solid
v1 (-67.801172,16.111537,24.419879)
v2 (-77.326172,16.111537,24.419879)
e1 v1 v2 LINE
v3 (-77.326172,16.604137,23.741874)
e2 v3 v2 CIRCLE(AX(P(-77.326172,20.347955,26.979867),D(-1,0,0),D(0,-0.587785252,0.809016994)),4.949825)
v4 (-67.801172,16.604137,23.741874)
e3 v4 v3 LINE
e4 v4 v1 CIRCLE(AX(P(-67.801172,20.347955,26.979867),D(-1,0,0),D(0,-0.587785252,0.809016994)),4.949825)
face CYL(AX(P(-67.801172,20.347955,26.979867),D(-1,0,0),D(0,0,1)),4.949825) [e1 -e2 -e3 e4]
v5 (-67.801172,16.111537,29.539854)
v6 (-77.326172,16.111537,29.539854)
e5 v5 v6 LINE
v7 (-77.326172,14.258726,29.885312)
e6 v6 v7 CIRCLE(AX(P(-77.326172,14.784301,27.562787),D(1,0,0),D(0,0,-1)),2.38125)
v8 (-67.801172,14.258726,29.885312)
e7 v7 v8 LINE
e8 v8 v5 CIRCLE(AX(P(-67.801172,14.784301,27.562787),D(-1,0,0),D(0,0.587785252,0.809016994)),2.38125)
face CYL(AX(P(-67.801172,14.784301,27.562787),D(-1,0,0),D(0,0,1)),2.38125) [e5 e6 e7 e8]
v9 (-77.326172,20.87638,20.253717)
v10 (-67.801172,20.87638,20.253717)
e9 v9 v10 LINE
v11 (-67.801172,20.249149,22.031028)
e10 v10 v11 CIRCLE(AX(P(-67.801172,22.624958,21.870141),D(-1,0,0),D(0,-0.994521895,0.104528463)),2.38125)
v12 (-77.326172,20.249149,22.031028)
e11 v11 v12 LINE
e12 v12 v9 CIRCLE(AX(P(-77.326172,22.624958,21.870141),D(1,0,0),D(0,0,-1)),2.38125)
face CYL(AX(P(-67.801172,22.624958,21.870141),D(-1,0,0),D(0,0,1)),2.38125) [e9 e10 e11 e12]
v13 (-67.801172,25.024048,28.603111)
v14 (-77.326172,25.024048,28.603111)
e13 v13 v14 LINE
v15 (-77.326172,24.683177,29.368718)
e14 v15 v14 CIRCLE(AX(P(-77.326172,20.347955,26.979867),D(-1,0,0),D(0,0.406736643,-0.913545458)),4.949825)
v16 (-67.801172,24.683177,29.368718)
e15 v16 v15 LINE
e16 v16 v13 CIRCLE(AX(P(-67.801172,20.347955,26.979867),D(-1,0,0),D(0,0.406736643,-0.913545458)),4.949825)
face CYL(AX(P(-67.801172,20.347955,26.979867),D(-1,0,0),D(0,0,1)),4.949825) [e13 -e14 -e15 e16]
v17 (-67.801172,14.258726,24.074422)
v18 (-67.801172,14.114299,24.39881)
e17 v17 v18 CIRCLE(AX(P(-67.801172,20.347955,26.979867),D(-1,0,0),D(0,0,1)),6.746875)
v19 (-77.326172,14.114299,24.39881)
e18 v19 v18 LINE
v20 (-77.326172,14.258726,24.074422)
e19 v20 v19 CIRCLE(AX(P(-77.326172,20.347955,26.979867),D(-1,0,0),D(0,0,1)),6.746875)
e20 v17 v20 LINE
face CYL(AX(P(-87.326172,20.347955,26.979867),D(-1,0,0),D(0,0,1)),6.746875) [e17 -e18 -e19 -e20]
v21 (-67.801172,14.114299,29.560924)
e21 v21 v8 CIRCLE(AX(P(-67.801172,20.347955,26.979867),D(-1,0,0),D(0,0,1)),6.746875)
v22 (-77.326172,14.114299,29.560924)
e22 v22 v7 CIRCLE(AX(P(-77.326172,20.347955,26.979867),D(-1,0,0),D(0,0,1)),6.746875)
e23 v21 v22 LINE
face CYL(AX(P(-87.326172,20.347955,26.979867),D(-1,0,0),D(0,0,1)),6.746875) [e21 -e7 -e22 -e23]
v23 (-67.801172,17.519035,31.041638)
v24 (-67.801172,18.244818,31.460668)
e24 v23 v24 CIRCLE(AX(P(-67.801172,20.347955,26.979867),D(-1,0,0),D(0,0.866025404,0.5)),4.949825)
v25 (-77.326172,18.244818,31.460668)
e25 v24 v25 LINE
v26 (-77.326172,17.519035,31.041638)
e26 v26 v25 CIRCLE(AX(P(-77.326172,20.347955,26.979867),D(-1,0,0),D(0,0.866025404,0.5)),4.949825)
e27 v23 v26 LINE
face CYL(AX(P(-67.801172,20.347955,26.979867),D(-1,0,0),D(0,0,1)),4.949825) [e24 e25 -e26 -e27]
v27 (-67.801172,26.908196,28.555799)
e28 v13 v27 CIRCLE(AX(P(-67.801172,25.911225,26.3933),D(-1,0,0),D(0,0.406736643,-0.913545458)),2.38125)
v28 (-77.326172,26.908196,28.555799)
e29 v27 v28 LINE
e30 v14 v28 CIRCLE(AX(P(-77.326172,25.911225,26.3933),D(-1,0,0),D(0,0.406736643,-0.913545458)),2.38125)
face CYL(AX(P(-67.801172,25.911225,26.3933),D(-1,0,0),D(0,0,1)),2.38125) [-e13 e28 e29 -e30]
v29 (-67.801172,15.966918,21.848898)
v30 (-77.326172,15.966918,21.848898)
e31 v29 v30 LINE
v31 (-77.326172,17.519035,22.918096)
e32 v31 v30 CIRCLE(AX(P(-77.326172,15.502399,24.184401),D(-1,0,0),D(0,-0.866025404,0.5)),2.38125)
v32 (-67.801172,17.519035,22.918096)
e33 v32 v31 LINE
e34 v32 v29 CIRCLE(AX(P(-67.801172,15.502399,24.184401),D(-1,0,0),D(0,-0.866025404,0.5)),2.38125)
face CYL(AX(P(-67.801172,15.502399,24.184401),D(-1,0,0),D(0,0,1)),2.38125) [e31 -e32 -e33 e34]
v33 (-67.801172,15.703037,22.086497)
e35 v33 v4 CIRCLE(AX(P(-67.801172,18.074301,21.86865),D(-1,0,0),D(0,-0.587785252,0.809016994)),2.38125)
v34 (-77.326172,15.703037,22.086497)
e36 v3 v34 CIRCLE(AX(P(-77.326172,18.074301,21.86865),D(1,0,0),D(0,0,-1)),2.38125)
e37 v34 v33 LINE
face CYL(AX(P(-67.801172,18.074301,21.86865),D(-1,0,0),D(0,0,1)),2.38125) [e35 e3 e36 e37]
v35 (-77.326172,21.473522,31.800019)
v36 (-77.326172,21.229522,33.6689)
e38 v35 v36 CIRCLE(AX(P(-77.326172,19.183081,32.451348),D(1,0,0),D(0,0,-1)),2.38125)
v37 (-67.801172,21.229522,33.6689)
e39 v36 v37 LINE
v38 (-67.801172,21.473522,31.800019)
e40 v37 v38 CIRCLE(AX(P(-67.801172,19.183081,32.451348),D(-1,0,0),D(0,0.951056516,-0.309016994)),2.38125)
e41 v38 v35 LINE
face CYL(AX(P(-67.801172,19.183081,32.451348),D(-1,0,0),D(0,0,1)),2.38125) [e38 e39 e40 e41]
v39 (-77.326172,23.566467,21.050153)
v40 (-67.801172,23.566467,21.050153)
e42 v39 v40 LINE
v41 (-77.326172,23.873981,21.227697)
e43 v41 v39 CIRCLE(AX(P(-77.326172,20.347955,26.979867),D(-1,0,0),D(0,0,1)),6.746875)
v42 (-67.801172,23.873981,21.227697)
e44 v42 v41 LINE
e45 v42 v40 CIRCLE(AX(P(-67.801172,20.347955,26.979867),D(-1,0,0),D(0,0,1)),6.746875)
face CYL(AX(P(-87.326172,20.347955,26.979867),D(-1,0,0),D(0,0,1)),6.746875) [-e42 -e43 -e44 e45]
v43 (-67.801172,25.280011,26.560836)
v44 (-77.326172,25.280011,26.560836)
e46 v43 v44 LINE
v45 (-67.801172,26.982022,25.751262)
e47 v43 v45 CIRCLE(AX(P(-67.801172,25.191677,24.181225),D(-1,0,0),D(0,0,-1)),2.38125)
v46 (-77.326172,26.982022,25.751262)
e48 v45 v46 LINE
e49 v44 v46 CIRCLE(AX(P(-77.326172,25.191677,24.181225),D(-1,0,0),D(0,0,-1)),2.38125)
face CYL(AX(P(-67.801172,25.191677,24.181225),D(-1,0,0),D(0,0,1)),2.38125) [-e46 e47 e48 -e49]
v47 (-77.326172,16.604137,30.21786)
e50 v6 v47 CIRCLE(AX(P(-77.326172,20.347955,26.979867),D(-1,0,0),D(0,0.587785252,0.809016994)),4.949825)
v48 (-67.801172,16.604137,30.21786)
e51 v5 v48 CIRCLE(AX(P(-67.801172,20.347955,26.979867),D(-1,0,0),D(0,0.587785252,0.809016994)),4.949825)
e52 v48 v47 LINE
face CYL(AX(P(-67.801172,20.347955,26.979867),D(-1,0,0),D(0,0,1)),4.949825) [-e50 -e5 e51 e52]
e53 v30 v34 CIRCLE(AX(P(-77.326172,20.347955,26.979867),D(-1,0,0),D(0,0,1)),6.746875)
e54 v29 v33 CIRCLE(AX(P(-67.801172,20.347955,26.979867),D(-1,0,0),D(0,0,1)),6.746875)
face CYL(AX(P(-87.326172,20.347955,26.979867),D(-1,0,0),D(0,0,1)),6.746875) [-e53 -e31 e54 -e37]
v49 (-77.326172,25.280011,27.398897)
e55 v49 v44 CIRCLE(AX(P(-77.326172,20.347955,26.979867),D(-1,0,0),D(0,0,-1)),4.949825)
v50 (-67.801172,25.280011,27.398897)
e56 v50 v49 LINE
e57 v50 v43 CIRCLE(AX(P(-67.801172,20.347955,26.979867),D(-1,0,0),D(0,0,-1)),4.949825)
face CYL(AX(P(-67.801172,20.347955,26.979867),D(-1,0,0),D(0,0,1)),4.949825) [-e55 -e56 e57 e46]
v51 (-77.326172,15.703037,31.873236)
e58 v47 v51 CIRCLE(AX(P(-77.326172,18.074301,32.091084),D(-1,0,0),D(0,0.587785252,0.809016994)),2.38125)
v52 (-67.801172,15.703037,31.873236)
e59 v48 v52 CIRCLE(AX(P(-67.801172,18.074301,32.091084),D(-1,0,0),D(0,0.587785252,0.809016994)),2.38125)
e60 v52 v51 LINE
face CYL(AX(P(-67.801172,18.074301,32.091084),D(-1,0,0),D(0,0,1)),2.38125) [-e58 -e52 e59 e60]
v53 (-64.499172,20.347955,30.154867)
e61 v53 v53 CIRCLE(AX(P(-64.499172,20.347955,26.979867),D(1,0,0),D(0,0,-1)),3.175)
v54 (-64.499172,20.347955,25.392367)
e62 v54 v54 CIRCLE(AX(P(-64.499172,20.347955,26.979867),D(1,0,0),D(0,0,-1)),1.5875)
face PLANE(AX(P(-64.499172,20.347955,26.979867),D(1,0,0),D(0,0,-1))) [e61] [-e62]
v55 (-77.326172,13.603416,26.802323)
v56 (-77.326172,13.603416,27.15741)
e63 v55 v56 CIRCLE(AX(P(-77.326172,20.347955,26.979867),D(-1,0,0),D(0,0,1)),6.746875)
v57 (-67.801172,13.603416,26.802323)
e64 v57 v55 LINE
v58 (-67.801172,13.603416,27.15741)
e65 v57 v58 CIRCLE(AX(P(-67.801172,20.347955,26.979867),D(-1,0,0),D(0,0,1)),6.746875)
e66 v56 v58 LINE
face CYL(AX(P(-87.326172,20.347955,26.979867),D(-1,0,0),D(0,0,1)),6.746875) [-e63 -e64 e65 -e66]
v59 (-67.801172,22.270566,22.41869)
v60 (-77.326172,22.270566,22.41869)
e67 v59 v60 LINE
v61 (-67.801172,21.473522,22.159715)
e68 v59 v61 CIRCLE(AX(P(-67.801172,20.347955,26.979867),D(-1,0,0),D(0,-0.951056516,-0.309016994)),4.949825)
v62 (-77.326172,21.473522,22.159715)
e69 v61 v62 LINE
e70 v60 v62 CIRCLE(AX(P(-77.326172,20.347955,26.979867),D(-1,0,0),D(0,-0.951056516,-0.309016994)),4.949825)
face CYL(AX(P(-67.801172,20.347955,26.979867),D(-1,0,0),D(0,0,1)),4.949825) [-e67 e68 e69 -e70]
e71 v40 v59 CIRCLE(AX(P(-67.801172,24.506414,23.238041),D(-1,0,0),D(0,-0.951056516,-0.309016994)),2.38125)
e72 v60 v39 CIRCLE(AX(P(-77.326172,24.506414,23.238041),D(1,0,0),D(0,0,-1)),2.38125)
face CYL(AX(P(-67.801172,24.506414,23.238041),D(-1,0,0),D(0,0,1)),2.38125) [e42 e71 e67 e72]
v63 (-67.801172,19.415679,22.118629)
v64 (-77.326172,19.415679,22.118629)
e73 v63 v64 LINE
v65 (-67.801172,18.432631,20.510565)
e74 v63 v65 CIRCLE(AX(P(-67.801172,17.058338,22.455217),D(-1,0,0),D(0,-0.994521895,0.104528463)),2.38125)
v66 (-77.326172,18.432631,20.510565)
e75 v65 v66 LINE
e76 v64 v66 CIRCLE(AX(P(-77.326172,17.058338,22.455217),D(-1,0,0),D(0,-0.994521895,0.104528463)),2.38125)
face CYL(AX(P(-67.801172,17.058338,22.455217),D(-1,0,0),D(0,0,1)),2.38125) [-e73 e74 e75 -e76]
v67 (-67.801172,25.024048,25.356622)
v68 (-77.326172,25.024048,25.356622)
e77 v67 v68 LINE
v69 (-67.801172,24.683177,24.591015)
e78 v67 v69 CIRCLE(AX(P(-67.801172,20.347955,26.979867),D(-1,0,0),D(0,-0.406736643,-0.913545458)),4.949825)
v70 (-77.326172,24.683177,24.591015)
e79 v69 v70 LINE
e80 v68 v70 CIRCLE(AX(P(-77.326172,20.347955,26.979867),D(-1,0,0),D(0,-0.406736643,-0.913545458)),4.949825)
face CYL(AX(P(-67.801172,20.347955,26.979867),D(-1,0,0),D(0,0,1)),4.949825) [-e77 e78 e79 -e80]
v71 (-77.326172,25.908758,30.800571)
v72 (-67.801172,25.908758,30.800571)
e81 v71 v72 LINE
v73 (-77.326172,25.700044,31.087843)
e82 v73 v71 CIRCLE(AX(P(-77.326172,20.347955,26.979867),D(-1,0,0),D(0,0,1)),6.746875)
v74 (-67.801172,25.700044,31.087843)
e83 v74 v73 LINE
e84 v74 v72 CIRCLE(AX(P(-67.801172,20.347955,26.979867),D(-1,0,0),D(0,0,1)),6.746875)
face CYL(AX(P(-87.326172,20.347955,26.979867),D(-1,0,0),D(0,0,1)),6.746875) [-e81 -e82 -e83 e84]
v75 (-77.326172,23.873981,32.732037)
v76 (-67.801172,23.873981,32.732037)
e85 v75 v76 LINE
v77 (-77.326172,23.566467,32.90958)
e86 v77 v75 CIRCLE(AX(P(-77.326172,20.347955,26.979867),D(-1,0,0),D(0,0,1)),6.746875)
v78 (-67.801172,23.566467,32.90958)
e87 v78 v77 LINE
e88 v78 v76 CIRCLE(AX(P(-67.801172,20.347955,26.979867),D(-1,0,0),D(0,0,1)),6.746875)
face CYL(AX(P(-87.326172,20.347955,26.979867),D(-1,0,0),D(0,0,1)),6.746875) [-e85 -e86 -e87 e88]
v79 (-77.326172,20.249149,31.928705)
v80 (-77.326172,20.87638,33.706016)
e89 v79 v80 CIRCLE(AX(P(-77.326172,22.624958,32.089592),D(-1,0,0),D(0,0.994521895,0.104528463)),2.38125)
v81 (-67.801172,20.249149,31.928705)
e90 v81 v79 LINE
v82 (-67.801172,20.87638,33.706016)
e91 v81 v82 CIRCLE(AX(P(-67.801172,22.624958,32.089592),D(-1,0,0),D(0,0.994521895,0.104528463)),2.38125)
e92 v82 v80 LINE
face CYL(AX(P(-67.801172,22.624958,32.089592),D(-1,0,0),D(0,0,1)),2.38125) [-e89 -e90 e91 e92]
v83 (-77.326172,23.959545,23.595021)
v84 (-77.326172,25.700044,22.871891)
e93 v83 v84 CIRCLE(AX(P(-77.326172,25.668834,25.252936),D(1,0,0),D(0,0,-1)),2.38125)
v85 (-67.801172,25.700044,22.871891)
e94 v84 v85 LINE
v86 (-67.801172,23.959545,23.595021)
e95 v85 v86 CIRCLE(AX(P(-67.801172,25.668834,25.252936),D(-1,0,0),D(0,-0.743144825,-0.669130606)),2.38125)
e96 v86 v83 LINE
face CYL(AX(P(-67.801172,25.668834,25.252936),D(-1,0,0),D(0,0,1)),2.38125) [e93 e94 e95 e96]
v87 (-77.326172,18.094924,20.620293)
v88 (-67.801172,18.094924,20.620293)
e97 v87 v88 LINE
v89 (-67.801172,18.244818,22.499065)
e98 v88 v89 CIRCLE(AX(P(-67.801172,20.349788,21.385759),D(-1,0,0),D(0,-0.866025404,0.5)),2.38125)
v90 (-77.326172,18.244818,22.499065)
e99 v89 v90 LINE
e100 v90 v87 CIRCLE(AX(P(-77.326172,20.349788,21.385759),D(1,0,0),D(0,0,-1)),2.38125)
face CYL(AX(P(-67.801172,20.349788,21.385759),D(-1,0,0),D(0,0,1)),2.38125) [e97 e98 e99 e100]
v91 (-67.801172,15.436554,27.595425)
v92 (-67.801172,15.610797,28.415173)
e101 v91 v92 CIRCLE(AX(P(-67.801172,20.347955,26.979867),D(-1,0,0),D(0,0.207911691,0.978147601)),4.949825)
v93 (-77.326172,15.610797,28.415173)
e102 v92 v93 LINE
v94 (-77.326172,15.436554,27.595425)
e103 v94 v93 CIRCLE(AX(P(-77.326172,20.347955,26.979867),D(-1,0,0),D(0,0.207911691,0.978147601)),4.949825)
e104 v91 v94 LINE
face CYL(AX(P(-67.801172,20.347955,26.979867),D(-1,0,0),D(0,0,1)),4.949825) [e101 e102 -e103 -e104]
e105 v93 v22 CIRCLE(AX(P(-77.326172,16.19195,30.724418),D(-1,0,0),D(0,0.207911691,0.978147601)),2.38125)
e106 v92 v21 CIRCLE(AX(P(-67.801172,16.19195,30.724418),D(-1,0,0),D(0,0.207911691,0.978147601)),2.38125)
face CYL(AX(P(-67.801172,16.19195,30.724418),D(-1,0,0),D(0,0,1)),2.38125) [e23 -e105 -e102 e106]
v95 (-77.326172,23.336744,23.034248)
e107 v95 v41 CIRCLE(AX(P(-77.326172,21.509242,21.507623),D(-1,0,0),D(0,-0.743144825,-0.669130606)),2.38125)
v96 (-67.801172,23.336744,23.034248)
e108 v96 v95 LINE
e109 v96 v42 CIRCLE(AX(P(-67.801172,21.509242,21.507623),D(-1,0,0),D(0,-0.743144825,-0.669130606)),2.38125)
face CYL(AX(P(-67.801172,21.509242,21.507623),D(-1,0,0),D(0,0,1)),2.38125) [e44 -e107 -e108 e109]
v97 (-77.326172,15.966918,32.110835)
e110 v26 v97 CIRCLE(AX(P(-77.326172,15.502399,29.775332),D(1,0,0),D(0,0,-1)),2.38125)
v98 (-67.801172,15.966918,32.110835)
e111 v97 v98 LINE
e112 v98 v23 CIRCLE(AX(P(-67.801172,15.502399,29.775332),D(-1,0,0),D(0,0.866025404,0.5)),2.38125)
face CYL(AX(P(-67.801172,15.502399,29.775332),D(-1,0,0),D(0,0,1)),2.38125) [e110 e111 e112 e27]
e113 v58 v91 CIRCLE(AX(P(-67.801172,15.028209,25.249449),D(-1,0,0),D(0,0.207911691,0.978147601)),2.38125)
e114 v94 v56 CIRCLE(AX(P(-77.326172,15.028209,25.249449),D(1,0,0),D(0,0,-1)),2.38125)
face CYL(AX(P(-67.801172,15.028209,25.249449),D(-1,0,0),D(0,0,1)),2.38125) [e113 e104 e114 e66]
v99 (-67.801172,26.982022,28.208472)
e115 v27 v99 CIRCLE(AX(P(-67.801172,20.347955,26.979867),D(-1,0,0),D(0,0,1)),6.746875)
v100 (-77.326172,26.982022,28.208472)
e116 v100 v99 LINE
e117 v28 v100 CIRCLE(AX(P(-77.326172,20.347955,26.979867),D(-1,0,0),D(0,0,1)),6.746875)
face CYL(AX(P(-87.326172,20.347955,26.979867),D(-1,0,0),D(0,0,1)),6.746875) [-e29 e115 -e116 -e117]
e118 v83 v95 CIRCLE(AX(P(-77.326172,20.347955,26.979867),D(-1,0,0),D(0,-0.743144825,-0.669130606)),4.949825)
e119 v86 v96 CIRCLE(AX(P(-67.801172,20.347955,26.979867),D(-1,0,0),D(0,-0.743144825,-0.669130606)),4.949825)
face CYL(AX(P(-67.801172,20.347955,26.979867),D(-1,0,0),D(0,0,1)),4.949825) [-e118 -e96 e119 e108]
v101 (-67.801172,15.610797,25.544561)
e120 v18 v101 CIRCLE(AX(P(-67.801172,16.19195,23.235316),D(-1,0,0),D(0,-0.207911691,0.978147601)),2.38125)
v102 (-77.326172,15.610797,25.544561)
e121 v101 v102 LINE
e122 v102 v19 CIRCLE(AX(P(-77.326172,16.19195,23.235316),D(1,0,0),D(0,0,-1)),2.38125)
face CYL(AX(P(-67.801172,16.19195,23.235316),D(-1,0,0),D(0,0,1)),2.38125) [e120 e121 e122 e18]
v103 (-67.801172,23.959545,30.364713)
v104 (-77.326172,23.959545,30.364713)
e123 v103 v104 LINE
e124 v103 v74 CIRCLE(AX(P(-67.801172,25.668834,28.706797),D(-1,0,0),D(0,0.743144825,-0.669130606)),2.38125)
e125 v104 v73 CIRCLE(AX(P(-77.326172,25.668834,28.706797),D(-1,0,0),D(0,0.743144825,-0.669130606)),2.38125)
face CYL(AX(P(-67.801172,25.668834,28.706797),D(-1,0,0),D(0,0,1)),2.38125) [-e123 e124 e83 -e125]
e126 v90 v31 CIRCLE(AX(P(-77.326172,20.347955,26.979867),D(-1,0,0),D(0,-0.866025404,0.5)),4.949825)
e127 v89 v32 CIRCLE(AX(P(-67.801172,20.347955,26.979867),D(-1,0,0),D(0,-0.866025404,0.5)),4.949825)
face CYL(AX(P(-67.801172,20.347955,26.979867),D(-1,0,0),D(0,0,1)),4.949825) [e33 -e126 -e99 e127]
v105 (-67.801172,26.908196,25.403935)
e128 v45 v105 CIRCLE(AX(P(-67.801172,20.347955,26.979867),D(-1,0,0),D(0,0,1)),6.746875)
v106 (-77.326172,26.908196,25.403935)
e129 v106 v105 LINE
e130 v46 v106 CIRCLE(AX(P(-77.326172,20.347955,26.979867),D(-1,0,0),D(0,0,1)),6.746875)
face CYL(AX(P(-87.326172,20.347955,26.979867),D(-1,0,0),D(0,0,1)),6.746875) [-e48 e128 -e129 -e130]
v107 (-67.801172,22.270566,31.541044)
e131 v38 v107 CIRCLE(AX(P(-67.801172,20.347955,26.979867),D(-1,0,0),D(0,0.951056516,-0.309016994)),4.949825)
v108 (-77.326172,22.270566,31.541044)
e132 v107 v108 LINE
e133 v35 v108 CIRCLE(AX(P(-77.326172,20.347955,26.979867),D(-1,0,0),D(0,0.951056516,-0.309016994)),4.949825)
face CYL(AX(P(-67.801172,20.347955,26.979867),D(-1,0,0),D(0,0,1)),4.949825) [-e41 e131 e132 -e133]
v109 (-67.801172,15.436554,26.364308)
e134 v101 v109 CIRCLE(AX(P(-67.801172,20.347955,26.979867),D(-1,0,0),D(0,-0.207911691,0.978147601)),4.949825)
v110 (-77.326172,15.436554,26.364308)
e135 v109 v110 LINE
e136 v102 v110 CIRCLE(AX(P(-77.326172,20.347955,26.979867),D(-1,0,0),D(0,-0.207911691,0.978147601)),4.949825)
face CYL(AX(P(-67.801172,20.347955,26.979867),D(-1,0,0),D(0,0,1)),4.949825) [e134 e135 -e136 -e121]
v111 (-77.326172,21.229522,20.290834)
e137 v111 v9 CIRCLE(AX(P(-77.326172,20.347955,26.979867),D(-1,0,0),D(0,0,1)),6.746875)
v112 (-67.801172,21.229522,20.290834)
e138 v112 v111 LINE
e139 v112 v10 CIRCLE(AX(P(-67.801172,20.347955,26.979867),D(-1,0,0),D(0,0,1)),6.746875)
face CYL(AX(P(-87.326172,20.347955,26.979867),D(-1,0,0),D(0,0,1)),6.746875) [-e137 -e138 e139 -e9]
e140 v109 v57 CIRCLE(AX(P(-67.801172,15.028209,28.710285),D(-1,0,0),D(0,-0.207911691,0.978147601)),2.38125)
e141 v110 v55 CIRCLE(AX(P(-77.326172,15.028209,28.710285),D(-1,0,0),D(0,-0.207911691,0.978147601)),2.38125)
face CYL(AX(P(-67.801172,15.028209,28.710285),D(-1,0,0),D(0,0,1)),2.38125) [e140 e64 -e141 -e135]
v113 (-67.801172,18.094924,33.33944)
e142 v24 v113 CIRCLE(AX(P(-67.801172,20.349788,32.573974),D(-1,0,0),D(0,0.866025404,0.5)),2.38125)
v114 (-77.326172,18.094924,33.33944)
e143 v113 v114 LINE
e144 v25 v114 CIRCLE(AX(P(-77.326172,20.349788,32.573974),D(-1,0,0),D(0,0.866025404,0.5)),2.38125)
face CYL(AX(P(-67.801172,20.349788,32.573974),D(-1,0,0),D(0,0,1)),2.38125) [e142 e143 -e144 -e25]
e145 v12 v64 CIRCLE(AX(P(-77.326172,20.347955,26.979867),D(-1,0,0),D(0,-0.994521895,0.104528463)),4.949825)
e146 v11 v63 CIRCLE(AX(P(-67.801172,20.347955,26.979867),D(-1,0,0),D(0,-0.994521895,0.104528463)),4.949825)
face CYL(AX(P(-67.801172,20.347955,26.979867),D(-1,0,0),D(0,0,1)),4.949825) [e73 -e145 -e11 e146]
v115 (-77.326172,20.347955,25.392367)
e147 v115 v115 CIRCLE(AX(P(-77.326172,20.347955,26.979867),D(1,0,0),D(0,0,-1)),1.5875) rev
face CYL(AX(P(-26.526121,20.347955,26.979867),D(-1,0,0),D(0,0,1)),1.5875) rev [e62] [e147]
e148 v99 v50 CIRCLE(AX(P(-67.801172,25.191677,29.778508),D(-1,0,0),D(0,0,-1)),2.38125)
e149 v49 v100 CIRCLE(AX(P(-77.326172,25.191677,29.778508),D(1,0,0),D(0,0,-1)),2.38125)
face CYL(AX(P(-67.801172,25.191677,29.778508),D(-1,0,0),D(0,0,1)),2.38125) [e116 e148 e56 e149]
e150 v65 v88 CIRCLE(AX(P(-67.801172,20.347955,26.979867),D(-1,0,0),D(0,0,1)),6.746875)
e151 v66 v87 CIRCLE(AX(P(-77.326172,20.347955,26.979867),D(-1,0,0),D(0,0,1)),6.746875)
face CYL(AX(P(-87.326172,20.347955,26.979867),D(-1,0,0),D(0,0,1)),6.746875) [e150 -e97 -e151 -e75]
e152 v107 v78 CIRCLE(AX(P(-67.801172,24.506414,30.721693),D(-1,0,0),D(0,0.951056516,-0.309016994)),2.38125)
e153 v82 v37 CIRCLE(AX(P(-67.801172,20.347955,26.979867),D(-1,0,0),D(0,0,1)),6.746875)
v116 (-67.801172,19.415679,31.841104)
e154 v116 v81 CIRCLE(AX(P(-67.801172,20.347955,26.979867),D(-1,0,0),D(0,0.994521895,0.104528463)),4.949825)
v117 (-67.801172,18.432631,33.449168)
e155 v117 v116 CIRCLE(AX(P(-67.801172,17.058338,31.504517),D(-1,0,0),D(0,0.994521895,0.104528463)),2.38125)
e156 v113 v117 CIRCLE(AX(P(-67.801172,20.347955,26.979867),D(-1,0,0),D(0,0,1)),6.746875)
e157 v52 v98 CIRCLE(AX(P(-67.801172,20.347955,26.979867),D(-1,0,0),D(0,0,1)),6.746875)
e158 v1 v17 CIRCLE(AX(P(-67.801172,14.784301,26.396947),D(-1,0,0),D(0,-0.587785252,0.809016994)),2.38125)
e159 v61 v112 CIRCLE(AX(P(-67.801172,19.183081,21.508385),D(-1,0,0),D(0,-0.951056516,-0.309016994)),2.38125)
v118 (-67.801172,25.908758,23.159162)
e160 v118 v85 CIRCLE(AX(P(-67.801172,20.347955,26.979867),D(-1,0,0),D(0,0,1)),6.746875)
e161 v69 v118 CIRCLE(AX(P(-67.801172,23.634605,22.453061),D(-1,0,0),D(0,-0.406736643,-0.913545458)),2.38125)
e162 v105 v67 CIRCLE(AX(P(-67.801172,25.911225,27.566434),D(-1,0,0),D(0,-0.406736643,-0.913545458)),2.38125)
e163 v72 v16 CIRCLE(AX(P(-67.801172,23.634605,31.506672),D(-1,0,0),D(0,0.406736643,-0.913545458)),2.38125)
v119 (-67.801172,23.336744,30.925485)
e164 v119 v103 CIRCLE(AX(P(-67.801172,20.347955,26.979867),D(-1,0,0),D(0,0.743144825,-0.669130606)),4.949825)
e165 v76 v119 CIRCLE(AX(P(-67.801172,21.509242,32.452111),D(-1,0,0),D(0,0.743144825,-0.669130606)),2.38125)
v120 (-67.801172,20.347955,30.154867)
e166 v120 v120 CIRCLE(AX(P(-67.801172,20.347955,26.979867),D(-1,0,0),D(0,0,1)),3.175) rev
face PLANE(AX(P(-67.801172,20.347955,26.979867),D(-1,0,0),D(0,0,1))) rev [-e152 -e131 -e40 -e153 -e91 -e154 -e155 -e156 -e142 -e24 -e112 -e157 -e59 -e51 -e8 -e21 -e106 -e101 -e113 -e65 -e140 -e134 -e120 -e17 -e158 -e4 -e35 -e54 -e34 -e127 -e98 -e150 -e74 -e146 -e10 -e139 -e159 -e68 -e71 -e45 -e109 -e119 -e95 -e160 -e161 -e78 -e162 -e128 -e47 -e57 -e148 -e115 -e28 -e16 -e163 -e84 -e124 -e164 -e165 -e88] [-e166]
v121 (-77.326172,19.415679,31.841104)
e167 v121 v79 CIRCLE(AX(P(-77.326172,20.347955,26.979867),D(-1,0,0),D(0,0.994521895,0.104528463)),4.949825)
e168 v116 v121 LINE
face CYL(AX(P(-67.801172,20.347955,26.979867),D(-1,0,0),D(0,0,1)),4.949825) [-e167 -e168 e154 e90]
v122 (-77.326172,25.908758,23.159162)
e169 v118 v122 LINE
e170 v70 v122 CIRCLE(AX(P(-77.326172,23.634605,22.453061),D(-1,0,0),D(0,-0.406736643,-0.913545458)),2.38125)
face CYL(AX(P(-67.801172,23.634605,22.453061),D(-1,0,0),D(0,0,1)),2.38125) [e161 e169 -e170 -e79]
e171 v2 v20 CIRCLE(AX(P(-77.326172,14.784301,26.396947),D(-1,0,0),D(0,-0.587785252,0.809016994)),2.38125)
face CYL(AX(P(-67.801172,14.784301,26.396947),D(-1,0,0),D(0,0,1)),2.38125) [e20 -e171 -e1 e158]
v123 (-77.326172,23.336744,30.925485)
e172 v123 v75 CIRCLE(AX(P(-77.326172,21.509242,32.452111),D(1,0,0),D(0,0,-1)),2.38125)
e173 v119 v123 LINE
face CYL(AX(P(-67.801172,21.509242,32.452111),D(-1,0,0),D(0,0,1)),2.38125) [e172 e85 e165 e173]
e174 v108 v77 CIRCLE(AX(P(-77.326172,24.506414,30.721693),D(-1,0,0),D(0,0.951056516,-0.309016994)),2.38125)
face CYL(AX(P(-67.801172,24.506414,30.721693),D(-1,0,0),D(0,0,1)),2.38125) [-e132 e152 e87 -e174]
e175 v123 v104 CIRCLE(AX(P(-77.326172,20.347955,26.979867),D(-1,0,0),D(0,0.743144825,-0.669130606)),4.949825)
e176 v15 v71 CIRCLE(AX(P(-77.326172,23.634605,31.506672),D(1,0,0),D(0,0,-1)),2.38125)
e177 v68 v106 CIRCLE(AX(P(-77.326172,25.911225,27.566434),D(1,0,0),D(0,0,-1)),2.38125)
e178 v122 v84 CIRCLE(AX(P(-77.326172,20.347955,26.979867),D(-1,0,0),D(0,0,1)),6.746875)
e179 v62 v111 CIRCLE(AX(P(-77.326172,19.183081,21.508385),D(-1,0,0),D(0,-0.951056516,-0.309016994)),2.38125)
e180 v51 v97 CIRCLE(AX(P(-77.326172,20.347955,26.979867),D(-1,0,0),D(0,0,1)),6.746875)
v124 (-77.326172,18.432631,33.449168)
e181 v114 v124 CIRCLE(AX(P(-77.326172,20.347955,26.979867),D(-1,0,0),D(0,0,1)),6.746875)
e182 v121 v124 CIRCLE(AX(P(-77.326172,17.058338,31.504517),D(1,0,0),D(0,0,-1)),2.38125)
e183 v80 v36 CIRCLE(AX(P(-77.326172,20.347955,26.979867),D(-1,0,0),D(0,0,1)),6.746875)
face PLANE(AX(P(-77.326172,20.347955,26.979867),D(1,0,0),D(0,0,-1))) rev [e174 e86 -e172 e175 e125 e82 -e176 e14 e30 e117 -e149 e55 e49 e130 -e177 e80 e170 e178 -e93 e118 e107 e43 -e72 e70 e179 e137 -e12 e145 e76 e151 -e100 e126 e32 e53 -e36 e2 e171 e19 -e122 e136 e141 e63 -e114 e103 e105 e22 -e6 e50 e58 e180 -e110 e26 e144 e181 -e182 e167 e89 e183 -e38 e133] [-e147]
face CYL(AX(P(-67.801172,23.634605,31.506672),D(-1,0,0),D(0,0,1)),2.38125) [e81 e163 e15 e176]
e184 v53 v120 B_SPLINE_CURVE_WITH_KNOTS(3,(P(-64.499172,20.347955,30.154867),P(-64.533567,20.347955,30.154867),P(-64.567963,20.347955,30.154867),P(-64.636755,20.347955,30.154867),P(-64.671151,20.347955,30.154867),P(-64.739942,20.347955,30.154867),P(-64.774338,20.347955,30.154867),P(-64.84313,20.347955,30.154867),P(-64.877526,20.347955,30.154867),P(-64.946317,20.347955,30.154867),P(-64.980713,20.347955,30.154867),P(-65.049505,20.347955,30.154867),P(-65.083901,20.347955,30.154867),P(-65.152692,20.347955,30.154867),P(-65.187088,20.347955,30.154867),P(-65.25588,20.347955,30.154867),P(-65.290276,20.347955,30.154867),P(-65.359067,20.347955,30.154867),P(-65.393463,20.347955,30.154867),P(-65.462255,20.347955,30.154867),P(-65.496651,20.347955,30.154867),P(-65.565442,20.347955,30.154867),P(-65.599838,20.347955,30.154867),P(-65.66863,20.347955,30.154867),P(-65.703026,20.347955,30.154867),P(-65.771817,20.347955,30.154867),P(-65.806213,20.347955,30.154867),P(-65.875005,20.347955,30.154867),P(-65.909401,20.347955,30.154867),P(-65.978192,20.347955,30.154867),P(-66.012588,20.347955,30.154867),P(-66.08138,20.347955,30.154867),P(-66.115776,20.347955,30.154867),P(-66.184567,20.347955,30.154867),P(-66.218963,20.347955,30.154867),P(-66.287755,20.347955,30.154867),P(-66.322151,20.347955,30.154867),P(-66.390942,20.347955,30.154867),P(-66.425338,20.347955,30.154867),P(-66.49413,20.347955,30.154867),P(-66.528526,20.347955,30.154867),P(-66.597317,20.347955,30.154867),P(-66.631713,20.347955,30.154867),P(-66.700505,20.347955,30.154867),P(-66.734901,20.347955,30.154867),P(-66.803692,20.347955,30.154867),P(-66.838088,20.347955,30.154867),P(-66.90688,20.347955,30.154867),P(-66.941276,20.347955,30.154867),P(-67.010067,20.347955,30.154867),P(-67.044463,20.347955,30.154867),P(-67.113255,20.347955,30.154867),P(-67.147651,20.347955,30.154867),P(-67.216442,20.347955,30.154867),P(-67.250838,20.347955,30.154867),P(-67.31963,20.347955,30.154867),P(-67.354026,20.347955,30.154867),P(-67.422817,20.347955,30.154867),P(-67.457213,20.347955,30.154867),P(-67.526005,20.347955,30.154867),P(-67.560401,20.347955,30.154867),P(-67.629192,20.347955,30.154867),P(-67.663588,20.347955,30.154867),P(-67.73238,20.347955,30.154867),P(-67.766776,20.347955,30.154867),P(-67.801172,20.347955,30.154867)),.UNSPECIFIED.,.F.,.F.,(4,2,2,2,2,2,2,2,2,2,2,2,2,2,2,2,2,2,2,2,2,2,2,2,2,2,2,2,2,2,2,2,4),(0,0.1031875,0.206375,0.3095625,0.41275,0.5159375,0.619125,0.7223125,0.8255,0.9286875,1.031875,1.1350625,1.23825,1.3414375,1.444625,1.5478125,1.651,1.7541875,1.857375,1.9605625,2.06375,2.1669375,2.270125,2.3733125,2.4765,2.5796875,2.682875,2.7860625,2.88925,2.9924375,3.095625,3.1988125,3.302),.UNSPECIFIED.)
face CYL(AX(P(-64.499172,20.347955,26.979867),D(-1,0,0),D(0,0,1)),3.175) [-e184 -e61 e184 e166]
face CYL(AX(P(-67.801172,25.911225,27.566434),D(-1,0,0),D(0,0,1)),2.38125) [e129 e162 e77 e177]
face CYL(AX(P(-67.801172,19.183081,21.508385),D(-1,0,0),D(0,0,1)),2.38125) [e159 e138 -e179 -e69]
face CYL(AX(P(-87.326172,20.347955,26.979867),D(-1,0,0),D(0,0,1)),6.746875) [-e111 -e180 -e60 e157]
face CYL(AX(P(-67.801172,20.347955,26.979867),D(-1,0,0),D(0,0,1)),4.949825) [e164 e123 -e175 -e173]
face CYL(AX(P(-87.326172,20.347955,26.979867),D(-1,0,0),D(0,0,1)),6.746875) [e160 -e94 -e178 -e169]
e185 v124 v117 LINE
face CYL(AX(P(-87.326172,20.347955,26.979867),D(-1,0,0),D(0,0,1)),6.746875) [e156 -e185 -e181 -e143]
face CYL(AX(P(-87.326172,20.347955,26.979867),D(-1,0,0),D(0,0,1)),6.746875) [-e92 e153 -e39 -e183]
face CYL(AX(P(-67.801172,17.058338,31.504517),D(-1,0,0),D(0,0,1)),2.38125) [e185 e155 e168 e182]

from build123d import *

# Parameters (mm, degrees)
SPUR_START             = -77.326171545
SPUR_GEAR_AI_OUTLINE_R = 1.5875
SPUR_GEAR_AI_DEPTH     = 9.525
SKETCH1_R              = 3.175
SKETCH1_R_2            = 1.5875
BOSS_EXTRUDE1_DEPTH    = 3.302


# Read off the part's stored shape, not the designer's step: spur gear_ai
with BuildPart() as part:
    # spur gear_ai outline → spur gear_ai (new body)
    with BuildSketch(Plane.YZ.offset(SPUR_START)):
        with BuildLine():
            ThreePointArc((25.700043696, 22.871890839), (25.806291245, 23.014153087), (25.908758385, 23.159161964))
            ThreePointArc((25.908758385, 23.159161964), (25.44365934, 24.001503635), (24.683177407, 24.591015164))
            ThreePointArc((24.683177407, 24.591015164), (24.869844856, 24.966591507), (25.024047568, 25.356622082))
            ThreePointArc((25.024047568, 25.356622082), (25.971001747, 25.185934076), (26.908195608, 25.40393472))
            ThreePointArc((26.908195608, 25.40393472), (26.947394305, 25.577112523), (26.982022272, 25.751261864))
            ThreePointArc((26.982022272, 25.751261864), (26.214521927, 26.331606447), (25.280011171, 26.560836158))
            ThreePointArc((25.280011171, 26.560836158), (25.297779711, 26.979866711), (25.280011171, 27.398897265))
            ThreePointArc((25.280011171, 27.398897265), (26.214521927, 27.628126976), (26.982022272, 28.208471559))
            ThreePointArc((26.982022272, 28.208471559), (26.947394305, 28.3826209), (26.908195608, 28.555798703))
            ThreePointArc((26.908195608, 28.555798703), (25.971001747, 28.773799347), (25.024047568, 28.60311134))
            ThreePointArc((25.024047568, 28.60311134), (24.869844856, 28.993141915), (24.683177407, 29.368718258))
            ThreePointArc((24.683177407, 29.368718258), (25.44365934, 29.958229787), (25.908758385, 30.800571458))
            ThreePointArc((25.908758385, 30.800571458), (25.806291245, 30.945580335), (25.700043696, 31.087842584))
            ThreePointArc((25.700043696, 31.087842584), (24.755205651, 30.905804997), (23.959545029, 30.36471278))
            ThreePointArc((23.959545029, 30.36471278), (23.660034115, 30.658303547), (23.336744253, 30.925485117))
            ThreePointArc((23.336744253, 30.925485117), (23.791703129, 31.773346565), (23.873981026, 32.732036797))
            ThreePointArc((23.873981026, 32.732036797), (23.721392211, 32.822831857), (23.566466975, 32.909580117))
            ThreePointArc((23.566466975, 32.909580117), (22.777355829, 32.358980252), (22.270565713, 31.541043584))
            ThreePointArc((22.270565713, 31.541043584), (21.877534755, 31.687430032), (21.473522236, 31.800018709))
            ThreePointArc((21.473522236, 31.800018709), (21.544291531, 32.759627129), (21.229521683, 33.668899671))
            ThreePointArc((21.229521683, 33.668899671), (21.053195187, 33.689781624), (20.876380246, 33.706016332))
            ThreePointArc((20.876380246, 33.706016332), (20.379440483, 32.882057908), (20.249149489, 31.92870547))
            ThreePointArc((20.249149489, 31.92870547), (19.83055711, 31.902576052), (19.415679368, 31.84110423))
            ThreePointArc((19.415679368, 31.84110423), (19.090022428, 32.746534609), (18.432631403, 33.449167979))
            ThreePointArc((18.432631403, 33.449167979), (18.263055677, 33.396526145), (18.09492394, 33.339440173))
            ThreePointArc((18.09492394, 33.339440173), (17.976080961, 32.384593086), (18.244817586, 31.460668176))
            ThreePointArc((18.244817586, 31.460668176), (17.873042211, 31.266540906), (17.519035377, 31.041637622))
            ThreePointArc((17.519035377, 31.041637622), (16.853261246, 31.736332821), (15.966917922, 32.110835325))
            ThreePointArc((15.966917922, 32.110835325), (15.833414151, 31.993771955), (15.703037123, 31.873235987))
            ThreePointArc((15.703037123, 31.873235987), (15.982839958, 30.952601973), (16.604137198, 30.217859601))
            ThreePointArc((16.604137198, 30.217859601), (16.343462167, 29.889300848), (16.111537238, 29.539853923))
            ThreePointArc((16.111537238, 29.539853923), (15.220764312, 29.903694832), (14.258725503, 29.885311585))
            ThreePointArc((14.258725503, 29.885311585), (14.184377702, 29.724068), (14.114298755, 29.560923799))
            ThreePointArc((14.114298755, 29.560923799), (14.744366952, 28.833688843), (15.610796869, 28.41517264))
            ThreePointArc((15.610796869, 28.41517264), (15.506295264, 28.008993196), (15.436554167, 27.595425178))
            ThreePointArc((15.436554167, 27.595425178), (14.474805177, 27.565500398), (13.603416133, 27.157410031))
            ThreePointArc((13.603416133, 27.157410031), (13.601079711, 26.979866712), (13.603416133, 26.802323392))
            ThreePointArc((13.603416133, 26.802323392), (14.474805177, 26.394233025), (15.436554167, 26.364308244))
            ThreePointArc((15.436554167, 26.364308244), (15.506295264, 25.950740226), (15.610796869, 25.544560783))
            ThreePointArc((15.610796869, 25.544560783), (14.744366952, 25.12604458), (14.114298755, 24.398809624))
            ThreePointArc((14.114298755, 24.398809624), (14.184377702, 24.235665423), (14.258725503, 24.074421838))
            ThreePointArc((14.258725503, 24.074421838), (15.220764312, 24.056038591), (16.111537238, 24.4198795))
            ThreePointArc((16.111537238, 24.4198795), (16.343462167, 24.070432575), (16.604137198, 23.741873821))
            ThreePointArc((16.604137198, 23.741873821), (15.982839958, 23.007131449), (15.703037123, 22.086497436))
            ThreePointArc((15.703037123, 22.086497436), (15.833414152, 21.965961467), (15.966917922, 21.848898097))
            ThreePointArc((15.966917922, 21.848898097), (16.853261246, 22.223400602), (17.519035377, 22.918095801))
            ThreePointArc((17.519035377, 22.918095801), (17.873042211, 22.693192517), (18.244817586, 22.499065247))
            ThreePointArc((18.244817586, 22.499065247), (17.976080961, 21.575140337), (18.09492394, 20.62029325))
            ThreePointArc((18.09492394, 20.62029325), (18.263055677, 20.563207278), (18.432631403, 20.510565444))
            ThreePointArc((18.432631403, 20.510565444), (19.090022428, 21.213198814), (19.415679368, 22.118629192))
            ThreePointArc((19.415679368, 22.118629192), (19.83055711, 22.057157371), (20.249149489, 22.031027953))
            ThreePointArc((20.249149489, 22.031027953), (20.379440483, 21.077675515), (20.876380246, 20.253717091))
            ThreePointArc((20.876380246, 20.253717091), (21.053195187, 20.269951799), (21.229521683, 20.290833751))
            ThreePointArc((21.229521683, 20.290833751), (21.544291531, 21.200106294), (21.473522236, 22.159714714))
            ThreePointArc((21.473522236, 22.159714714), (21.877534755, 22.272303391), (22.270565713, 22.418689838))
            ThreePointArc((22.270565713, 22.418689838), (22.777355829, 21.600753171), (23.566466975, 21.050153306))
            ThreePointArc((23.566466975, 21.050153306), (23.721392211, 21.136901565), (23.873981026, 21.227696625))
            ThreePointArc((23.873981026, 21.227696625), (23.791703129, 22.186386858), (23.336744253, 23.034248306))
            ThreePointArc((23.336744253, 23.034248306), (23.660034115, 23.301429876), (23.959545029, 23.595020643))
            ThreePointArc((23.959545029, 23.595020643), (24.755205651, 23.053928425), (25.700043696, 22.871890839))
        make_face()
        with Locations((20.347954711, 26.979866711)):
            Circle(SPUR_GEAR_AI_OUTLINE_R, mode=Mode.SUBTRACT)
    extrude(amount=SPUR_GEAR_AI_DEPTH)

    # Sketch1 → Boss-Extrude1 (add)
    with BuildSketch(Plane(origin=(-67.801171545, 0, 0), x_dir=(0, 0, -1), z_dir=(1, 0, 0))):
        with Locations(Location((-26.979866711, 20.347954711, 0), (0, 0, 180))):
            Circle(SKETCH1_R)
        with Locations((-26.979866711, 20.347954711)):
            Circle(SKETCH1_R_2, mode=Mode.SUBTRACT)
    extrude(amount=BOSS_EXTRUDE1_DEPTH)


solid = part.part
